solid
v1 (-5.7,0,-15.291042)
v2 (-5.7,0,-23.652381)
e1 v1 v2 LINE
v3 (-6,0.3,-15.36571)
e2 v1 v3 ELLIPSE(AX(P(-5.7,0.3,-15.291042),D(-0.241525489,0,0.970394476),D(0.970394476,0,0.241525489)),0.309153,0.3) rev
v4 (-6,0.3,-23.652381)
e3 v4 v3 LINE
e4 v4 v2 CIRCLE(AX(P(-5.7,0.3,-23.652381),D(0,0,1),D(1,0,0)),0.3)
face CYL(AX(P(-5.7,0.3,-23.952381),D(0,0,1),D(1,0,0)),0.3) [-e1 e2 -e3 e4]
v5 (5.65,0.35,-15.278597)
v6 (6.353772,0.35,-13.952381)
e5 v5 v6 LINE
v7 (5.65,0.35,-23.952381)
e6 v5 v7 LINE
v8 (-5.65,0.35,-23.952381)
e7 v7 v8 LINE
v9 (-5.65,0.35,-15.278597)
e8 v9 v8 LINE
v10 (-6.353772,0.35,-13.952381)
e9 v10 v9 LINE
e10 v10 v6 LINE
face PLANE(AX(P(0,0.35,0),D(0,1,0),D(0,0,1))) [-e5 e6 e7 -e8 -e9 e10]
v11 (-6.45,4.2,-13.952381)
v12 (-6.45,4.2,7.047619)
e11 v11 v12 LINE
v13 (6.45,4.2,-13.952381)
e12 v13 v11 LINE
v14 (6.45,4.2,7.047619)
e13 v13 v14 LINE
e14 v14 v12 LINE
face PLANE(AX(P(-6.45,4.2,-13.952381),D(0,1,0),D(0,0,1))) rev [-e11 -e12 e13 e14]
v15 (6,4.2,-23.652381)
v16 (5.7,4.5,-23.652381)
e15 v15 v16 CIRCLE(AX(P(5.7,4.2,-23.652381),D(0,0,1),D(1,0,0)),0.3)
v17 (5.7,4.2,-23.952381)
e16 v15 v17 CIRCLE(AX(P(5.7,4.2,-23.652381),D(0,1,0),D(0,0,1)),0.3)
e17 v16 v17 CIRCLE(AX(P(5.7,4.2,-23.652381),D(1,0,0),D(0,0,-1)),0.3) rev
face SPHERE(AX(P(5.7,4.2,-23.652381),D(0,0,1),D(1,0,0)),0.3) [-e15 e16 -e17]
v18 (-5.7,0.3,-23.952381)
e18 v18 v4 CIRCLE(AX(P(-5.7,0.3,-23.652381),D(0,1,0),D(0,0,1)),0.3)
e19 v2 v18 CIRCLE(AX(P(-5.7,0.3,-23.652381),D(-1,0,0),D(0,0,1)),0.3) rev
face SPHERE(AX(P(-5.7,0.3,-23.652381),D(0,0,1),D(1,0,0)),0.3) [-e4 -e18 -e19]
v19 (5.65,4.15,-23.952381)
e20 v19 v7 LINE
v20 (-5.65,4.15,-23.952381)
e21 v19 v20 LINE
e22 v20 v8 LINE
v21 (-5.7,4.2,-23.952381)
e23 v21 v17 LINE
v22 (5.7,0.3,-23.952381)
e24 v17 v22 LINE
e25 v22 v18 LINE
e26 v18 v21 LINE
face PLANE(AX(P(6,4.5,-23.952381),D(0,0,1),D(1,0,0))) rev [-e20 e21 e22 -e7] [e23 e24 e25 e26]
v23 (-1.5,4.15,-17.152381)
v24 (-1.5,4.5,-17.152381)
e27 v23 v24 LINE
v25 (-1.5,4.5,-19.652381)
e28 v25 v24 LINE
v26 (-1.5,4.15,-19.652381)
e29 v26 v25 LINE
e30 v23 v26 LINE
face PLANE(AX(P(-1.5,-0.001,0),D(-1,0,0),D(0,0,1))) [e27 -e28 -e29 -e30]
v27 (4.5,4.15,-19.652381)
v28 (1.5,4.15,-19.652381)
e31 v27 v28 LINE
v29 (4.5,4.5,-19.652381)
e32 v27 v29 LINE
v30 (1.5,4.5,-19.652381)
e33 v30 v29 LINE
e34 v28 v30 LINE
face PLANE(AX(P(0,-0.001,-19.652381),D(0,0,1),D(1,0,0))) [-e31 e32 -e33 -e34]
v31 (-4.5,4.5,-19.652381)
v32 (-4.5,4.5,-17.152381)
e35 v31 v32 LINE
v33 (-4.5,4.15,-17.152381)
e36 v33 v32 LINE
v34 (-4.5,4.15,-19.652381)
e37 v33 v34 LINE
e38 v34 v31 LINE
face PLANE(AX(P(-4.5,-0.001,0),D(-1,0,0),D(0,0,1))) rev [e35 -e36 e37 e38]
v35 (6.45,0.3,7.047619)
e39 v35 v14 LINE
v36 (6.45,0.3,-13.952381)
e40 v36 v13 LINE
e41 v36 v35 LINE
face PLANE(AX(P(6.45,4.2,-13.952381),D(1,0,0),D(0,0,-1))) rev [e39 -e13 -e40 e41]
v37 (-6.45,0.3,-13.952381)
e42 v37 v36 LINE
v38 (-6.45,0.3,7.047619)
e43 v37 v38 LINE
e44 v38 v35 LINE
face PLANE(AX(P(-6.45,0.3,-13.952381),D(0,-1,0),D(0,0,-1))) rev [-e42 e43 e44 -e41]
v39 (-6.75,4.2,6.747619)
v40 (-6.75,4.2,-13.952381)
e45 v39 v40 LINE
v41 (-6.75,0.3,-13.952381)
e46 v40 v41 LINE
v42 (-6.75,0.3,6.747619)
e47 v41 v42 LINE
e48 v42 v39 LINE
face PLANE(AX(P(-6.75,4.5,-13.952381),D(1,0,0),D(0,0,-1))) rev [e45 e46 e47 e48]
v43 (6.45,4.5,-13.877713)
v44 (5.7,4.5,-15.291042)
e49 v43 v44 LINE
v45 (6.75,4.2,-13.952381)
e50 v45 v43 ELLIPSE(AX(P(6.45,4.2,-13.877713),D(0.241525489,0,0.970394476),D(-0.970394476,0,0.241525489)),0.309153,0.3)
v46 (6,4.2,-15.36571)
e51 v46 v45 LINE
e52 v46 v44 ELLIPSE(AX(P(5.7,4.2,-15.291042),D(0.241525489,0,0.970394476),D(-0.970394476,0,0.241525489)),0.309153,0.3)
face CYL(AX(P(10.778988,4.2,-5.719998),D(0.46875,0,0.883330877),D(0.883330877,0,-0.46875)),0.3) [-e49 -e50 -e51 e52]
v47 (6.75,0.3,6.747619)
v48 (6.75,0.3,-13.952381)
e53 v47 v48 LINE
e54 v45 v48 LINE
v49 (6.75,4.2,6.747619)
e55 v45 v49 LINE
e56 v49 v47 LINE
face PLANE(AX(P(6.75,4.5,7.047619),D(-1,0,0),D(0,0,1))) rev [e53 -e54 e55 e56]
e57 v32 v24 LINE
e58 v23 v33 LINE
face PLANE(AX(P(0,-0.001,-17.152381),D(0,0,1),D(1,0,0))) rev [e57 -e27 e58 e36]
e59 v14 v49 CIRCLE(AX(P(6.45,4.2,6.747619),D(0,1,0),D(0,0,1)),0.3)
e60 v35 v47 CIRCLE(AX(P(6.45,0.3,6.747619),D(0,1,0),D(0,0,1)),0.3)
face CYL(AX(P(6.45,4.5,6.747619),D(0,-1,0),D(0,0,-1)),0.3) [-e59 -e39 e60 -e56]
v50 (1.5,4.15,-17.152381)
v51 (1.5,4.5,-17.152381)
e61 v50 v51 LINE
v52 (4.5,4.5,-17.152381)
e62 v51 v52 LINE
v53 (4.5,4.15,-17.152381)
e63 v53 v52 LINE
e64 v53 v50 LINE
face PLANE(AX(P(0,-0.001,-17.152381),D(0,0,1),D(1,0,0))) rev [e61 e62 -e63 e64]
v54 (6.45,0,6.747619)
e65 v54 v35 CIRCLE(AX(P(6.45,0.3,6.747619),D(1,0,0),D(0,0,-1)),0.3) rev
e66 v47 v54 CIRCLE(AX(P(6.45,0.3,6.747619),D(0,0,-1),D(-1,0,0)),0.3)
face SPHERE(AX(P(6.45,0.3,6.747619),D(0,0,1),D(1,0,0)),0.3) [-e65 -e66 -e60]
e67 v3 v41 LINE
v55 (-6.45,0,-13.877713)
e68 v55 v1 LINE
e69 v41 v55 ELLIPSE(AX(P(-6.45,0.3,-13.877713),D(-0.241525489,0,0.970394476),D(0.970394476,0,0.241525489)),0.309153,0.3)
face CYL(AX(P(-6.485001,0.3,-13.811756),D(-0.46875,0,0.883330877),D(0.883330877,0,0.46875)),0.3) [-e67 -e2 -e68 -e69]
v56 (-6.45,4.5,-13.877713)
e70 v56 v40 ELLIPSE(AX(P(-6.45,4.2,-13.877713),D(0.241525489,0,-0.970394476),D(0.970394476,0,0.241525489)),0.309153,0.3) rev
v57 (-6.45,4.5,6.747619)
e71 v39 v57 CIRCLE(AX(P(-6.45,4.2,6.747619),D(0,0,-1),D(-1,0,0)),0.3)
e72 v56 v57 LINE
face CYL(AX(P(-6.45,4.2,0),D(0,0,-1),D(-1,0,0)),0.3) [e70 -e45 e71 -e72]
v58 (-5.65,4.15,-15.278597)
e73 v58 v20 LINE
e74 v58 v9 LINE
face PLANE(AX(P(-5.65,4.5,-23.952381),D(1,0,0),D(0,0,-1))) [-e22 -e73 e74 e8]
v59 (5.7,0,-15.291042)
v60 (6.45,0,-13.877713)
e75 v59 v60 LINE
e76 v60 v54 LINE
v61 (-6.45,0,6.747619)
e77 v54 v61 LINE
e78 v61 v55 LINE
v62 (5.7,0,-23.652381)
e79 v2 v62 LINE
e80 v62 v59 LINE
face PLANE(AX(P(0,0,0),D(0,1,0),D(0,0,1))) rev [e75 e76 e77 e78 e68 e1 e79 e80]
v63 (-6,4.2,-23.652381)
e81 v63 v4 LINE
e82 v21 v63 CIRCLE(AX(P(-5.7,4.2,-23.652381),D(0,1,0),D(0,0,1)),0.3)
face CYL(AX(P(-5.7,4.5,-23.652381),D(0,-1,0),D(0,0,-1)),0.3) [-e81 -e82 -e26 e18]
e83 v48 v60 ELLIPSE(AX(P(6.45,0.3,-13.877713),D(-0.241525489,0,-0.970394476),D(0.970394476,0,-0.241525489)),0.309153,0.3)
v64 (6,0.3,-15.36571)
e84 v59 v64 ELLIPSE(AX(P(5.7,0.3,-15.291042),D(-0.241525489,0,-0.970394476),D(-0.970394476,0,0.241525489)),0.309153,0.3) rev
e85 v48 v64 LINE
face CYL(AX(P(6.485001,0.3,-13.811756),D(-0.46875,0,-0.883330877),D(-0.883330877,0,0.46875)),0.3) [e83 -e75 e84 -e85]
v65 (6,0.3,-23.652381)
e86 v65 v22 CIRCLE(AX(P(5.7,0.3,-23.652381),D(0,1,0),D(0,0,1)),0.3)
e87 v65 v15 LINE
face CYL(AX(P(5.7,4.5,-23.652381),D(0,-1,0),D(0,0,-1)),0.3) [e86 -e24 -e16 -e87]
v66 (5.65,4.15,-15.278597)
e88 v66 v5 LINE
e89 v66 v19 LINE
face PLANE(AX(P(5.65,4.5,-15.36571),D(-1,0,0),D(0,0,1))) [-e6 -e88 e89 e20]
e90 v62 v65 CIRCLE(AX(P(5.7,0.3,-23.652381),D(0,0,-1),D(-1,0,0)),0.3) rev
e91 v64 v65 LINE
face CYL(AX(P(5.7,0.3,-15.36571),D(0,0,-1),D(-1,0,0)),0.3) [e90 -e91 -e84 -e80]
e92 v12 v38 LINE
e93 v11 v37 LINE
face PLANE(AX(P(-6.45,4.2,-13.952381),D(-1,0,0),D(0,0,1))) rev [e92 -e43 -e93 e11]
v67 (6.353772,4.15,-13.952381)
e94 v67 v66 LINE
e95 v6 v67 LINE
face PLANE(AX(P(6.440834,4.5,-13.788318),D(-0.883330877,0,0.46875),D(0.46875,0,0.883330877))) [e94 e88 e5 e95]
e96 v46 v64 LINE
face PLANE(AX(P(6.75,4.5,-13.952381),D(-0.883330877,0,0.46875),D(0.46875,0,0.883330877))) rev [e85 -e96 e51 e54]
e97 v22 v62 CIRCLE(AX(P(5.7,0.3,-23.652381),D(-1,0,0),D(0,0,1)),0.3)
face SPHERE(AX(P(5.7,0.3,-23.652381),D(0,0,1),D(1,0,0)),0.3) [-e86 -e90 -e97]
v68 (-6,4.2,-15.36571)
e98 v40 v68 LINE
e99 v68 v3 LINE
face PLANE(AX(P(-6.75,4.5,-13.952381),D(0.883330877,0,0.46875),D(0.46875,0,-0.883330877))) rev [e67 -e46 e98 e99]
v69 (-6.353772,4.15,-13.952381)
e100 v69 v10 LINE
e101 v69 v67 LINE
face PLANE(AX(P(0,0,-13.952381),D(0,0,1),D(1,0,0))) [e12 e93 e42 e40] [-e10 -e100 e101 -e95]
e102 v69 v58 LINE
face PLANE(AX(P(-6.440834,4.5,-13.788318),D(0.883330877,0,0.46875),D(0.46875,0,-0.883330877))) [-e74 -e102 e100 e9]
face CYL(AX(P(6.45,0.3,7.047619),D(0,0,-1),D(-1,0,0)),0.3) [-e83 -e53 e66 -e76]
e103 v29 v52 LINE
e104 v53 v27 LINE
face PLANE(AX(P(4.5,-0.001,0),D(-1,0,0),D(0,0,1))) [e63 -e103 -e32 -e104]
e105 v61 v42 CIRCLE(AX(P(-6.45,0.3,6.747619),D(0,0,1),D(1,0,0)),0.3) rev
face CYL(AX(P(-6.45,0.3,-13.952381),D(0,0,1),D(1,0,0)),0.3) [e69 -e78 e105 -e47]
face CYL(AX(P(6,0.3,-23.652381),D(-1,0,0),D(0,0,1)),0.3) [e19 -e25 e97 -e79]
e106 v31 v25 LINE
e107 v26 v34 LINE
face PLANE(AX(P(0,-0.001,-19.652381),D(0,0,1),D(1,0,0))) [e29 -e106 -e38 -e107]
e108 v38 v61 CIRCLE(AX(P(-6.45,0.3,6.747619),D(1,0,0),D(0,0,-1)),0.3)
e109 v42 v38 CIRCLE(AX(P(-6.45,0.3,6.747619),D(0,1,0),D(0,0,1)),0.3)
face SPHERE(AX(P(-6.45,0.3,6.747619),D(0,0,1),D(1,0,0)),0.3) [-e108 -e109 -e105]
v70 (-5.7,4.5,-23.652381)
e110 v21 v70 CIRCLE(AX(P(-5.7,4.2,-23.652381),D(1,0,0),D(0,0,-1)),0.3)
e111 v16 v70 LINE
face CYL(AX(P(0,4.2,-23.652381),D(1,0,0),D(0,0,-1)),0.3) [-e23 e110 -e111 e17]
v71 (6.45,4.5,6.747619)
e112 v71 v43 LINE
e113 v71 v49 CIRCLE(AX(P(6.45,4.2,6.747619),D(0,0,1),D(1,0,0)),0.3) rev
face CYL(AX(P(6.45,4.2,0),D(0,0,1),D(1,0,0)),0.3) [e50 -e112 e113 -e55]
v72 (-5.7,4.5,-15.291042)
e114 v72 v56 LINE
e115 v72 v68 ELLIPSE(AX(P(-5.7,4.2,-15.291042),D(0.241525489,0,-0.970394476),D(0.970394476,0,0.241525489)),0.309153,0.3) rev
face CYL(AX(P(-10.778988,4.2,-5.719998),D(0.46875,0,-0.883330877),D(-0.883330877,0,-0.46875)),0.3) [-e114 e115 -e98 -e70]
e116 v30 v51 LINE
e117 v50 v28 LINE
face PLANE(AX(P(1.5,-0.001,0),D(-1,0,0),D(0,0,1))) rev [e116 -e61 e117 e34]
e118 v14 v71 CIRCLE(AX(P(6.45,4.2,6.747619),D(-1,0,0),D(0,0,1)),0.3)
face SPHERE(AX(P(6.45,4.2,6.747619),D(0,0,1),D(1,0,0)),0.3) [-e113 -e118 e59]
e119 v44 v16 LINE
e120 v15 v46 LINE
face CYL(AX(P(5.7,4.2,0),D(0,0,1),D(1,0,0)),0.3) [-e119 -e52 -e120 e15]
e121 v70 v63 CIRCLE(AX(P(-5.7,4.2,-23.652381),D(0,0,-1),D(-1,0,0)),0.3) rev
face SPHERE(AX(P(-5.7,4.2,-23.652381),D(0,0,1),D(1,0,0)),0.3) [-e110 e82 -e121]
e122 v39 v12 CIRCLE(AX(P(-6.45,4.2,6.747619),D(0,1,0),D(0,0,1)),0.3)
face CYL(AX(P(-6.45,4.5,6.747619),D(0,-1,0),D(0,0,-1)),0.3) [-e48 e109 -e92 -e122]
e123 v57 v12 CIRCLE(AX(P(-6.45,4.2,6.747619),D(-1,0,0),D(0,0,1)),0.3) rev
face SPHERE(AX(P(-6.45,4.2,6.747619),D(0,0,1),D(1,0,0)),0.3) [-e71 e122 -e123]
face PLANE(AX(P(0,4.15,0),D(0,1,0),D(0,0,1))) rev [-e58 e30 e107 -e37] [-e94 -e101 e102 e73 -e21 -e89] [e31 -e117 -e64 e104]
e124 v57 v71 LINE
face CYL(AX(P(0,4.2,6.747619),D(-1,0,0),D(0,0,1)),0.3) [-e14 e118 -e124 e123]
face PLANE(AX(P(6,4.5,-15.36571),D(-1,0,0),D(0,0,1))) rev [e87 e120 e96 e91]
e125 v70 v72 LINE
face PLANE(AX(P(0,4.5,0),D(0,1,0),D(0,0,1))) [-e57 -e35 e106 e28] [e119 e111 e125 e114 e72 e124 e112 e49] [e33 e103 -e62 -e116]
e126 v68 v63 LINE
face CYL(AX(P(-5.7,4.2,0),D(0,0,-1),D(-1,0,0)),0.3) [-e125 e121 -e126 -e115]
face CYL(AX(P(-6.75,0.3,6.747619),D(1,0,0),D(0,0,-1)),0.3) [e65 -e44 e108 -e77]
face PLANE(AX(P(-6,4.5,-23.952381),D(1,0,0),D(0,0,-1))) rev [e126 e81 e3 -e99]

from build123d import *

# Parameters (mm, degrees)
BOSS_EXTRUDE1_DEPTH = 4.5
FILLET1_R           = 0.3
FILLET2_R           = 0.3
SHELL3_START        = 0.35
SHELL3_DEPTH        = 3.8
SKETCH3_W           = 12.9
SKETCH3_H           = 3.9
CUT_EXTRUDE1_DEPTH  = 21
CUT_EXTRUDE2_REACH  = 27.289
SKETCH4_W           = 3
SKETCH4_H           = 2.5


# Read off the part's stored shape, not the designer's step: Shell3
with BuildPart() as part:
    # Sketch1 → Boss-Extrude1 (new body)
    with BuildSketch(Plane(origin=(0, 0, 0), x_dir=(1, 0, 0), z_dir=(0, 1, 0))):
        Polygon((-6.75, -7.047619048), (6.75, -7.047619048), (6.75, 13.952380952), (6, 15.365710355), (6, 23.952380952), (-6, 23.952380952), (-6, 15.365710355), (-6.75, 13.952380952), align=None)
    extrude(amount=BOSS_EXTRUDE1_DEPTH)

    # Fillet1
    fillet1_edges = [part.edges().sort_by_distance(p)[0] for p in [
        (6, 4.5, -19.659045654),
        (6.375, 0, -14.659045654),
        (6.75, 0, -3.452380952),
        (0, 4.5, -23.952380952),
        (-6, 4.5, -19.659045654),
        (-6.375, 4.5, -14.659045654),
        (-6.75, 4.5, -3.452380952),
        (0, 4.5, 7.047619048),
        (6.75, 4.5, -3.452380952),
        (6.375, 4.5, -14.659045654),
        (0, 0, 7.047619048),
        (-6.75, 0, -3.452380952),
        (-6.375, 0, -14.659045654),
        (-6, 0, -19.659045654),
        (0, 0, -23.952380952),
        (6, 0, -19.659045654),
    ]]
    fillet(fillet1_edges, radius=FILLET1_R)

    # Fillet2
    # the kernel refuses this fillet: 0.3 mm, written as the material it takes off along each edge
    with BuildSketch(Plane(origin=(-6.45, 0.3, 6.747619048), x_dir=(-1, 0, 0), z_dir=(0, 0, 1))) as fillet2_piece_1_section:
        Polygon((0, 0), (FILLET2_R, 0), (FILLET2_R, FILLET2_R), (0, FILLET2_R), align=None)
    fillet2_piece_1 = extrude(amount=FILLET2_R, mode=Mode.PRIVATE)
    fillet2_piece_1 = fillet2_piece_1 - Plane(origin=(-6.45, 0.3, 6.747619048), x_dir=(0.7071067811865475, 0.7071067811865475, 0), z_dir=(0, 0, 1)) * Sphere(FILLET2_R, mode=Mode.PRIVATE)
    add(fillet2_piece_1, mode=Mode.SUBTRACT)
    with BuildSketch(Plane(origin=(-5.7, 0.3, -23.652380952), x_dir=(0, 0, -1), z_dir=(-1, 0, 0))) as fillet2_piece_2_section:
        Polygon((0, 0), (FILLET2_R, 0), (FILLET2_R, FILLET2_R), (0, FILLET2_R), align=None)
    fillet2_piece_2 = extrude(amount=FILLET2_R, mode=Mode.PRIVATE)
    fillet2_piece_2 = fillet2_piece_2 - Plane(origin=(-5.7, 0.3, -23.652380952), x_dir=(0, 0.7071067811865475, 0.7071067811865475), z_dir=(-1, 0, 0)) * Sphere(FILLET2_R, mode=Mode.PRIVATE)
    add(fillet2_piece_2, mode=Mode.SUBTRACT)
    with BuildSketch(Plane(origin=(6.45, 0.3, 6.747619048), x_dir=(1, 0, 0), z_dir=(0, 0, 1))) as fillet2_piece_3_section:
        Polygon((0, 0), (FILLET2_R, 0), (FILLET2_R, -FILLET2_R), (0, -FILLET2_R), align=None)
    fillet2_piece_3 = extrude(amount=FILLET2_R, mode=Mode.PRIVATE)
    fillet2_piece_3 = fillet2_piece_3 - Plane(origin=(6.45, 0.3, 6.747619048), x_dir=(-0.7071067811865475, 0.7071067811865475, 0), z_dir=(0, 0, 1)) * Sphere(FILLET2_R, mode=Mode.PRIVATE)
    add(fillet2_piece_3, mode=Mode.SUBTRACT)
    with BuildSketch(Plane(origin=(5.7, 0.3, -23.652380952), x_dir=(0, 0, -1), z_dir=(1, 0, 0))) as fillet2_piece_4_section:
        Polygon((0, 0), (FILLET2_R, 0), (FILLET2_R, -FILLET2_R), (0, -FILLET2_R), align=None)
    fillet2_piece_4 = extrude(amount=FILLET2_R, mode=Mode.PRIVATE)
    fillet2_piece_4 = fillet2_piece_4 - Plane(origin=(5.7, 0.3, -23.652380952), x_dir=(0, 0.7071067811865475, 0.7071067811865475), z_dir=(1, 0, 0)) * Sphere(FILLET2_R, mode=Mode.PRIVATE)
    add(fillet2_piece_4, mode=Mode.SUBTRACT)
    with BuildSketch(Plane(origin=(-5.7, 4.2, -23.652380952), x_dir=(0, 0, -1), z_dir=(-1, 0, 0))) as fillet2_piece_5_section:
        Polygon((0, 0), (FILLET2_R, 0), (FILLET2_R, -FILLET2_R), (0, -FILLET2_R), align=None)
    fillet2_piece_5 = extrude(amount=FILLET2_R, mode=Mode.PRIVATE)
    fillet2_piece_5 = fillet2_piece_5 - Plane(origin=(-5.7, 4.2, -23.652380952), x_dir=(0, -0.7071067811865475, 0.7071067811865475), z_dir=(-1, 0, 0)) * Sphere(FILLET2_R, mode=Mode.PRIVATE)
    add(fillet2_piece_5, mode=Mode.SUBTRACT)
    with BuildSketch(Plane(origin=(5.7, 4.2, -23.652380952), x_dir=(0, 0, -1), z_dir=(1, 0, 0))) as fillet2_piece_6_section:
        Polygon((0, 0), (FILLET2_R, 0), (FILLET2_R, FILLET2_R), (0, FILLET2_R), align=None)
    fillet2_piece_6 = extrude(amount=FILLET2_R, mode=Mode.PRIVATE)
    fillet2_piece_6 = fillet2_piece_6 - Plane(origin=(5.7, 4.2, -23.652380952), x_dir=(0, -0.7071067811865475, 0.7071067811865475), z_dir=(1, 0, 0)) * Sphere(FILLET2_R, mode=Mode.PRIVATE)
    add(fillet2_piece_6, mode=Mode.SUBTRACT)
    with BuildSketch(Plane(origin=(-6.45, 4.2, 6.747619048), x_dir=(-1, 0, 0), z_dir=(0, 0, 1))) as fillet2_piece_7_section:
        Polygon((0, 0), (FILLET2_R, 0), (FILLET2_R, -FILLET2_R), (0, -FILLET2_R), align=None)
    fillet2_piece_7 = extrude(amount=FILLET2_R, mode=Mode.PRIVATE)
    fillet2_piece_7 = fillet2_piece_7 - Plane(origin=(-6.45, 4.2, 6.747619048), x_dir=(0.7071067811865475, -0.7071067811865475, 0), z_dir=(0, 0, 1)) * Sphere(FILLET2_R, mode=Mode.PRIVATE)
    add(fillet2_piece_7, mode=Mode.SUBTRACT)
    with BuildSketch(Plane(origin=(6.45, 4.2, 6.747619048), x_dir=(1, 0, 0), z_dir=(0, 0, 1))) as fillet2_piece_8_section:
        Polygon((0, 0), (FILLET2_R, 0), (FILLET2_R, FILLET2_R), (0, FILLET2_R), align=None)
    fillet2_piece_8 = extrude(amount=FILLET2_R, mode=Mode.PRIVATE)
    fillet2_piece_8 = fillet2_piece_8 - Plane(origin=(6.45, 4.2, 6.747619048), x_dir=(-0.7071067811865475, -0.7071067811865475, 0), z_dir=(0, 0, 1)) * Sphere(FILLET2_R, mode=Mode.PRIVATE)
    add(fillet2_piece_8, mode=Mode.SUBTRACT)
    with BuildSketch(Plane(origin=(6, 0.3, -23.952380952), x_dir=(0, 0, 1), z_dir=(0, 1, 0)), Plane(origin=(6.75, 0.3, 7.047619048), x_dir=(-1, 0, 0), z_dir=(0, 1, 0))) as fillet2_piece_9:
        with BuildLine():
            CenterArc((FILLET2_R, -FILLET2_R), FILLET2_R, 90, 90)
            Line((0, -FILLET2_R), (0, 0))
            Line((0, 0), (FILLET2_R, 0))
        make_face()
    extrude(amount=3.9, mode=Mode.SUBTRACT)
    with BuildSketch(Plane(origin=(-6, 0.3, -23.952380952), x_dir=(0, 0, 1), z_dir=(0, 1, 0)), Plane(origin=(-6.75, 0.3, 7.047619048), x_dir=(1, 0, 0), z_dir=(0, 1, 0))) as fillet2_piece_10:
        with BuildLine():
            CenterArc((FILLET2_R, FILLET2_R), FILLET2_R, 180, 90)
            Line((0, FILLET2_R), (0, 0))
            Line((0, 0), (FILLET2_R, 0))
        make_face()
    extrude(amount=3.9, mode=Mode.SUBTRACT)

    # Shell3 outline → Shell3 (cut)
    with BuildSketch(Plane(origin=(0, 0, 0), x_dir=(1, 0, 0), z_dir=(0, 1, 0)).offset(SHELL3_START)):
        Polygon((6.4, -6.697619048), (6.4, 13.865268007), (5.65, 15.278597409), (5.65, 23.952380952), (-5.65, 23.952380952), (-5.65, 15.278597409), (-6.4, 13.865268007), (-6.4, -6.697619048), align=None)
    extrude(amount=SHELL3_DEPTH, mode=Mode.SUBTRACT)

    # Sketch3 → Cut-Extrude1 (cut)
    with BuildSketch(Plane.XY.offset(7.047619048)):
        with Locations((0, 2.25)):
            Rectangle(SKETCH3_W, SKETCH3_H)
    extrude(amount=-CUT_EXTRUDE1_DEPTH, mode=Mode.SUBTRACT)

    # Sketch4 → Cut-Extrude2 (cut, up to next)
    with BuildSketch(Plane(origin=(0, 4.5, 0), x_dir=(1, 0, 0), z_dir=(0, 1, 0)), mode=Mode.PRIVATE) as cut_extrude2_sk1:
        with Locations((3, 18.402380952)):
            Rectangle(SKETCH4_W, SKETCH4_H)
    cut_extrude2_tool1 = extrude(cut_extrude2_sk1.sketch, amount=-CUT_EXTRUDE2_REACH, mode=Mode.PRIVATE) & part.part
    # Sketch4 → Cut-Extrude2 (cut, up to next)
    with BuildSketch(Plane(origin=(0, 4.5, 0), x_dir=(1, 0, 0), z_dir=(0, 1, 0)), mode=Mode.PRIVATE) as cut_extrude2_sk2:
        with Locations((-3, 18.402380952)):
            Rectangle(SKETCH4_W, SKETCH4_H)
    cut_extrude2_tool2 = extrude(cut_extrude2_sk2.sketch, amount=-CUT_EXTRUDE2_REACH, mode=Mode.PRIVATE) & part.part
    add(cut_extrude2_tool1.solids().sort_by_distance((3, 4.5, -18.402381))[0], mode=Mode.SUBTRACT)
    add(cut_extrude2_tool2.solids().sort_by_distance((-3, 4.5, -18.402381))[0], mode=Mode.SUBTRACT)


solid = part.part
